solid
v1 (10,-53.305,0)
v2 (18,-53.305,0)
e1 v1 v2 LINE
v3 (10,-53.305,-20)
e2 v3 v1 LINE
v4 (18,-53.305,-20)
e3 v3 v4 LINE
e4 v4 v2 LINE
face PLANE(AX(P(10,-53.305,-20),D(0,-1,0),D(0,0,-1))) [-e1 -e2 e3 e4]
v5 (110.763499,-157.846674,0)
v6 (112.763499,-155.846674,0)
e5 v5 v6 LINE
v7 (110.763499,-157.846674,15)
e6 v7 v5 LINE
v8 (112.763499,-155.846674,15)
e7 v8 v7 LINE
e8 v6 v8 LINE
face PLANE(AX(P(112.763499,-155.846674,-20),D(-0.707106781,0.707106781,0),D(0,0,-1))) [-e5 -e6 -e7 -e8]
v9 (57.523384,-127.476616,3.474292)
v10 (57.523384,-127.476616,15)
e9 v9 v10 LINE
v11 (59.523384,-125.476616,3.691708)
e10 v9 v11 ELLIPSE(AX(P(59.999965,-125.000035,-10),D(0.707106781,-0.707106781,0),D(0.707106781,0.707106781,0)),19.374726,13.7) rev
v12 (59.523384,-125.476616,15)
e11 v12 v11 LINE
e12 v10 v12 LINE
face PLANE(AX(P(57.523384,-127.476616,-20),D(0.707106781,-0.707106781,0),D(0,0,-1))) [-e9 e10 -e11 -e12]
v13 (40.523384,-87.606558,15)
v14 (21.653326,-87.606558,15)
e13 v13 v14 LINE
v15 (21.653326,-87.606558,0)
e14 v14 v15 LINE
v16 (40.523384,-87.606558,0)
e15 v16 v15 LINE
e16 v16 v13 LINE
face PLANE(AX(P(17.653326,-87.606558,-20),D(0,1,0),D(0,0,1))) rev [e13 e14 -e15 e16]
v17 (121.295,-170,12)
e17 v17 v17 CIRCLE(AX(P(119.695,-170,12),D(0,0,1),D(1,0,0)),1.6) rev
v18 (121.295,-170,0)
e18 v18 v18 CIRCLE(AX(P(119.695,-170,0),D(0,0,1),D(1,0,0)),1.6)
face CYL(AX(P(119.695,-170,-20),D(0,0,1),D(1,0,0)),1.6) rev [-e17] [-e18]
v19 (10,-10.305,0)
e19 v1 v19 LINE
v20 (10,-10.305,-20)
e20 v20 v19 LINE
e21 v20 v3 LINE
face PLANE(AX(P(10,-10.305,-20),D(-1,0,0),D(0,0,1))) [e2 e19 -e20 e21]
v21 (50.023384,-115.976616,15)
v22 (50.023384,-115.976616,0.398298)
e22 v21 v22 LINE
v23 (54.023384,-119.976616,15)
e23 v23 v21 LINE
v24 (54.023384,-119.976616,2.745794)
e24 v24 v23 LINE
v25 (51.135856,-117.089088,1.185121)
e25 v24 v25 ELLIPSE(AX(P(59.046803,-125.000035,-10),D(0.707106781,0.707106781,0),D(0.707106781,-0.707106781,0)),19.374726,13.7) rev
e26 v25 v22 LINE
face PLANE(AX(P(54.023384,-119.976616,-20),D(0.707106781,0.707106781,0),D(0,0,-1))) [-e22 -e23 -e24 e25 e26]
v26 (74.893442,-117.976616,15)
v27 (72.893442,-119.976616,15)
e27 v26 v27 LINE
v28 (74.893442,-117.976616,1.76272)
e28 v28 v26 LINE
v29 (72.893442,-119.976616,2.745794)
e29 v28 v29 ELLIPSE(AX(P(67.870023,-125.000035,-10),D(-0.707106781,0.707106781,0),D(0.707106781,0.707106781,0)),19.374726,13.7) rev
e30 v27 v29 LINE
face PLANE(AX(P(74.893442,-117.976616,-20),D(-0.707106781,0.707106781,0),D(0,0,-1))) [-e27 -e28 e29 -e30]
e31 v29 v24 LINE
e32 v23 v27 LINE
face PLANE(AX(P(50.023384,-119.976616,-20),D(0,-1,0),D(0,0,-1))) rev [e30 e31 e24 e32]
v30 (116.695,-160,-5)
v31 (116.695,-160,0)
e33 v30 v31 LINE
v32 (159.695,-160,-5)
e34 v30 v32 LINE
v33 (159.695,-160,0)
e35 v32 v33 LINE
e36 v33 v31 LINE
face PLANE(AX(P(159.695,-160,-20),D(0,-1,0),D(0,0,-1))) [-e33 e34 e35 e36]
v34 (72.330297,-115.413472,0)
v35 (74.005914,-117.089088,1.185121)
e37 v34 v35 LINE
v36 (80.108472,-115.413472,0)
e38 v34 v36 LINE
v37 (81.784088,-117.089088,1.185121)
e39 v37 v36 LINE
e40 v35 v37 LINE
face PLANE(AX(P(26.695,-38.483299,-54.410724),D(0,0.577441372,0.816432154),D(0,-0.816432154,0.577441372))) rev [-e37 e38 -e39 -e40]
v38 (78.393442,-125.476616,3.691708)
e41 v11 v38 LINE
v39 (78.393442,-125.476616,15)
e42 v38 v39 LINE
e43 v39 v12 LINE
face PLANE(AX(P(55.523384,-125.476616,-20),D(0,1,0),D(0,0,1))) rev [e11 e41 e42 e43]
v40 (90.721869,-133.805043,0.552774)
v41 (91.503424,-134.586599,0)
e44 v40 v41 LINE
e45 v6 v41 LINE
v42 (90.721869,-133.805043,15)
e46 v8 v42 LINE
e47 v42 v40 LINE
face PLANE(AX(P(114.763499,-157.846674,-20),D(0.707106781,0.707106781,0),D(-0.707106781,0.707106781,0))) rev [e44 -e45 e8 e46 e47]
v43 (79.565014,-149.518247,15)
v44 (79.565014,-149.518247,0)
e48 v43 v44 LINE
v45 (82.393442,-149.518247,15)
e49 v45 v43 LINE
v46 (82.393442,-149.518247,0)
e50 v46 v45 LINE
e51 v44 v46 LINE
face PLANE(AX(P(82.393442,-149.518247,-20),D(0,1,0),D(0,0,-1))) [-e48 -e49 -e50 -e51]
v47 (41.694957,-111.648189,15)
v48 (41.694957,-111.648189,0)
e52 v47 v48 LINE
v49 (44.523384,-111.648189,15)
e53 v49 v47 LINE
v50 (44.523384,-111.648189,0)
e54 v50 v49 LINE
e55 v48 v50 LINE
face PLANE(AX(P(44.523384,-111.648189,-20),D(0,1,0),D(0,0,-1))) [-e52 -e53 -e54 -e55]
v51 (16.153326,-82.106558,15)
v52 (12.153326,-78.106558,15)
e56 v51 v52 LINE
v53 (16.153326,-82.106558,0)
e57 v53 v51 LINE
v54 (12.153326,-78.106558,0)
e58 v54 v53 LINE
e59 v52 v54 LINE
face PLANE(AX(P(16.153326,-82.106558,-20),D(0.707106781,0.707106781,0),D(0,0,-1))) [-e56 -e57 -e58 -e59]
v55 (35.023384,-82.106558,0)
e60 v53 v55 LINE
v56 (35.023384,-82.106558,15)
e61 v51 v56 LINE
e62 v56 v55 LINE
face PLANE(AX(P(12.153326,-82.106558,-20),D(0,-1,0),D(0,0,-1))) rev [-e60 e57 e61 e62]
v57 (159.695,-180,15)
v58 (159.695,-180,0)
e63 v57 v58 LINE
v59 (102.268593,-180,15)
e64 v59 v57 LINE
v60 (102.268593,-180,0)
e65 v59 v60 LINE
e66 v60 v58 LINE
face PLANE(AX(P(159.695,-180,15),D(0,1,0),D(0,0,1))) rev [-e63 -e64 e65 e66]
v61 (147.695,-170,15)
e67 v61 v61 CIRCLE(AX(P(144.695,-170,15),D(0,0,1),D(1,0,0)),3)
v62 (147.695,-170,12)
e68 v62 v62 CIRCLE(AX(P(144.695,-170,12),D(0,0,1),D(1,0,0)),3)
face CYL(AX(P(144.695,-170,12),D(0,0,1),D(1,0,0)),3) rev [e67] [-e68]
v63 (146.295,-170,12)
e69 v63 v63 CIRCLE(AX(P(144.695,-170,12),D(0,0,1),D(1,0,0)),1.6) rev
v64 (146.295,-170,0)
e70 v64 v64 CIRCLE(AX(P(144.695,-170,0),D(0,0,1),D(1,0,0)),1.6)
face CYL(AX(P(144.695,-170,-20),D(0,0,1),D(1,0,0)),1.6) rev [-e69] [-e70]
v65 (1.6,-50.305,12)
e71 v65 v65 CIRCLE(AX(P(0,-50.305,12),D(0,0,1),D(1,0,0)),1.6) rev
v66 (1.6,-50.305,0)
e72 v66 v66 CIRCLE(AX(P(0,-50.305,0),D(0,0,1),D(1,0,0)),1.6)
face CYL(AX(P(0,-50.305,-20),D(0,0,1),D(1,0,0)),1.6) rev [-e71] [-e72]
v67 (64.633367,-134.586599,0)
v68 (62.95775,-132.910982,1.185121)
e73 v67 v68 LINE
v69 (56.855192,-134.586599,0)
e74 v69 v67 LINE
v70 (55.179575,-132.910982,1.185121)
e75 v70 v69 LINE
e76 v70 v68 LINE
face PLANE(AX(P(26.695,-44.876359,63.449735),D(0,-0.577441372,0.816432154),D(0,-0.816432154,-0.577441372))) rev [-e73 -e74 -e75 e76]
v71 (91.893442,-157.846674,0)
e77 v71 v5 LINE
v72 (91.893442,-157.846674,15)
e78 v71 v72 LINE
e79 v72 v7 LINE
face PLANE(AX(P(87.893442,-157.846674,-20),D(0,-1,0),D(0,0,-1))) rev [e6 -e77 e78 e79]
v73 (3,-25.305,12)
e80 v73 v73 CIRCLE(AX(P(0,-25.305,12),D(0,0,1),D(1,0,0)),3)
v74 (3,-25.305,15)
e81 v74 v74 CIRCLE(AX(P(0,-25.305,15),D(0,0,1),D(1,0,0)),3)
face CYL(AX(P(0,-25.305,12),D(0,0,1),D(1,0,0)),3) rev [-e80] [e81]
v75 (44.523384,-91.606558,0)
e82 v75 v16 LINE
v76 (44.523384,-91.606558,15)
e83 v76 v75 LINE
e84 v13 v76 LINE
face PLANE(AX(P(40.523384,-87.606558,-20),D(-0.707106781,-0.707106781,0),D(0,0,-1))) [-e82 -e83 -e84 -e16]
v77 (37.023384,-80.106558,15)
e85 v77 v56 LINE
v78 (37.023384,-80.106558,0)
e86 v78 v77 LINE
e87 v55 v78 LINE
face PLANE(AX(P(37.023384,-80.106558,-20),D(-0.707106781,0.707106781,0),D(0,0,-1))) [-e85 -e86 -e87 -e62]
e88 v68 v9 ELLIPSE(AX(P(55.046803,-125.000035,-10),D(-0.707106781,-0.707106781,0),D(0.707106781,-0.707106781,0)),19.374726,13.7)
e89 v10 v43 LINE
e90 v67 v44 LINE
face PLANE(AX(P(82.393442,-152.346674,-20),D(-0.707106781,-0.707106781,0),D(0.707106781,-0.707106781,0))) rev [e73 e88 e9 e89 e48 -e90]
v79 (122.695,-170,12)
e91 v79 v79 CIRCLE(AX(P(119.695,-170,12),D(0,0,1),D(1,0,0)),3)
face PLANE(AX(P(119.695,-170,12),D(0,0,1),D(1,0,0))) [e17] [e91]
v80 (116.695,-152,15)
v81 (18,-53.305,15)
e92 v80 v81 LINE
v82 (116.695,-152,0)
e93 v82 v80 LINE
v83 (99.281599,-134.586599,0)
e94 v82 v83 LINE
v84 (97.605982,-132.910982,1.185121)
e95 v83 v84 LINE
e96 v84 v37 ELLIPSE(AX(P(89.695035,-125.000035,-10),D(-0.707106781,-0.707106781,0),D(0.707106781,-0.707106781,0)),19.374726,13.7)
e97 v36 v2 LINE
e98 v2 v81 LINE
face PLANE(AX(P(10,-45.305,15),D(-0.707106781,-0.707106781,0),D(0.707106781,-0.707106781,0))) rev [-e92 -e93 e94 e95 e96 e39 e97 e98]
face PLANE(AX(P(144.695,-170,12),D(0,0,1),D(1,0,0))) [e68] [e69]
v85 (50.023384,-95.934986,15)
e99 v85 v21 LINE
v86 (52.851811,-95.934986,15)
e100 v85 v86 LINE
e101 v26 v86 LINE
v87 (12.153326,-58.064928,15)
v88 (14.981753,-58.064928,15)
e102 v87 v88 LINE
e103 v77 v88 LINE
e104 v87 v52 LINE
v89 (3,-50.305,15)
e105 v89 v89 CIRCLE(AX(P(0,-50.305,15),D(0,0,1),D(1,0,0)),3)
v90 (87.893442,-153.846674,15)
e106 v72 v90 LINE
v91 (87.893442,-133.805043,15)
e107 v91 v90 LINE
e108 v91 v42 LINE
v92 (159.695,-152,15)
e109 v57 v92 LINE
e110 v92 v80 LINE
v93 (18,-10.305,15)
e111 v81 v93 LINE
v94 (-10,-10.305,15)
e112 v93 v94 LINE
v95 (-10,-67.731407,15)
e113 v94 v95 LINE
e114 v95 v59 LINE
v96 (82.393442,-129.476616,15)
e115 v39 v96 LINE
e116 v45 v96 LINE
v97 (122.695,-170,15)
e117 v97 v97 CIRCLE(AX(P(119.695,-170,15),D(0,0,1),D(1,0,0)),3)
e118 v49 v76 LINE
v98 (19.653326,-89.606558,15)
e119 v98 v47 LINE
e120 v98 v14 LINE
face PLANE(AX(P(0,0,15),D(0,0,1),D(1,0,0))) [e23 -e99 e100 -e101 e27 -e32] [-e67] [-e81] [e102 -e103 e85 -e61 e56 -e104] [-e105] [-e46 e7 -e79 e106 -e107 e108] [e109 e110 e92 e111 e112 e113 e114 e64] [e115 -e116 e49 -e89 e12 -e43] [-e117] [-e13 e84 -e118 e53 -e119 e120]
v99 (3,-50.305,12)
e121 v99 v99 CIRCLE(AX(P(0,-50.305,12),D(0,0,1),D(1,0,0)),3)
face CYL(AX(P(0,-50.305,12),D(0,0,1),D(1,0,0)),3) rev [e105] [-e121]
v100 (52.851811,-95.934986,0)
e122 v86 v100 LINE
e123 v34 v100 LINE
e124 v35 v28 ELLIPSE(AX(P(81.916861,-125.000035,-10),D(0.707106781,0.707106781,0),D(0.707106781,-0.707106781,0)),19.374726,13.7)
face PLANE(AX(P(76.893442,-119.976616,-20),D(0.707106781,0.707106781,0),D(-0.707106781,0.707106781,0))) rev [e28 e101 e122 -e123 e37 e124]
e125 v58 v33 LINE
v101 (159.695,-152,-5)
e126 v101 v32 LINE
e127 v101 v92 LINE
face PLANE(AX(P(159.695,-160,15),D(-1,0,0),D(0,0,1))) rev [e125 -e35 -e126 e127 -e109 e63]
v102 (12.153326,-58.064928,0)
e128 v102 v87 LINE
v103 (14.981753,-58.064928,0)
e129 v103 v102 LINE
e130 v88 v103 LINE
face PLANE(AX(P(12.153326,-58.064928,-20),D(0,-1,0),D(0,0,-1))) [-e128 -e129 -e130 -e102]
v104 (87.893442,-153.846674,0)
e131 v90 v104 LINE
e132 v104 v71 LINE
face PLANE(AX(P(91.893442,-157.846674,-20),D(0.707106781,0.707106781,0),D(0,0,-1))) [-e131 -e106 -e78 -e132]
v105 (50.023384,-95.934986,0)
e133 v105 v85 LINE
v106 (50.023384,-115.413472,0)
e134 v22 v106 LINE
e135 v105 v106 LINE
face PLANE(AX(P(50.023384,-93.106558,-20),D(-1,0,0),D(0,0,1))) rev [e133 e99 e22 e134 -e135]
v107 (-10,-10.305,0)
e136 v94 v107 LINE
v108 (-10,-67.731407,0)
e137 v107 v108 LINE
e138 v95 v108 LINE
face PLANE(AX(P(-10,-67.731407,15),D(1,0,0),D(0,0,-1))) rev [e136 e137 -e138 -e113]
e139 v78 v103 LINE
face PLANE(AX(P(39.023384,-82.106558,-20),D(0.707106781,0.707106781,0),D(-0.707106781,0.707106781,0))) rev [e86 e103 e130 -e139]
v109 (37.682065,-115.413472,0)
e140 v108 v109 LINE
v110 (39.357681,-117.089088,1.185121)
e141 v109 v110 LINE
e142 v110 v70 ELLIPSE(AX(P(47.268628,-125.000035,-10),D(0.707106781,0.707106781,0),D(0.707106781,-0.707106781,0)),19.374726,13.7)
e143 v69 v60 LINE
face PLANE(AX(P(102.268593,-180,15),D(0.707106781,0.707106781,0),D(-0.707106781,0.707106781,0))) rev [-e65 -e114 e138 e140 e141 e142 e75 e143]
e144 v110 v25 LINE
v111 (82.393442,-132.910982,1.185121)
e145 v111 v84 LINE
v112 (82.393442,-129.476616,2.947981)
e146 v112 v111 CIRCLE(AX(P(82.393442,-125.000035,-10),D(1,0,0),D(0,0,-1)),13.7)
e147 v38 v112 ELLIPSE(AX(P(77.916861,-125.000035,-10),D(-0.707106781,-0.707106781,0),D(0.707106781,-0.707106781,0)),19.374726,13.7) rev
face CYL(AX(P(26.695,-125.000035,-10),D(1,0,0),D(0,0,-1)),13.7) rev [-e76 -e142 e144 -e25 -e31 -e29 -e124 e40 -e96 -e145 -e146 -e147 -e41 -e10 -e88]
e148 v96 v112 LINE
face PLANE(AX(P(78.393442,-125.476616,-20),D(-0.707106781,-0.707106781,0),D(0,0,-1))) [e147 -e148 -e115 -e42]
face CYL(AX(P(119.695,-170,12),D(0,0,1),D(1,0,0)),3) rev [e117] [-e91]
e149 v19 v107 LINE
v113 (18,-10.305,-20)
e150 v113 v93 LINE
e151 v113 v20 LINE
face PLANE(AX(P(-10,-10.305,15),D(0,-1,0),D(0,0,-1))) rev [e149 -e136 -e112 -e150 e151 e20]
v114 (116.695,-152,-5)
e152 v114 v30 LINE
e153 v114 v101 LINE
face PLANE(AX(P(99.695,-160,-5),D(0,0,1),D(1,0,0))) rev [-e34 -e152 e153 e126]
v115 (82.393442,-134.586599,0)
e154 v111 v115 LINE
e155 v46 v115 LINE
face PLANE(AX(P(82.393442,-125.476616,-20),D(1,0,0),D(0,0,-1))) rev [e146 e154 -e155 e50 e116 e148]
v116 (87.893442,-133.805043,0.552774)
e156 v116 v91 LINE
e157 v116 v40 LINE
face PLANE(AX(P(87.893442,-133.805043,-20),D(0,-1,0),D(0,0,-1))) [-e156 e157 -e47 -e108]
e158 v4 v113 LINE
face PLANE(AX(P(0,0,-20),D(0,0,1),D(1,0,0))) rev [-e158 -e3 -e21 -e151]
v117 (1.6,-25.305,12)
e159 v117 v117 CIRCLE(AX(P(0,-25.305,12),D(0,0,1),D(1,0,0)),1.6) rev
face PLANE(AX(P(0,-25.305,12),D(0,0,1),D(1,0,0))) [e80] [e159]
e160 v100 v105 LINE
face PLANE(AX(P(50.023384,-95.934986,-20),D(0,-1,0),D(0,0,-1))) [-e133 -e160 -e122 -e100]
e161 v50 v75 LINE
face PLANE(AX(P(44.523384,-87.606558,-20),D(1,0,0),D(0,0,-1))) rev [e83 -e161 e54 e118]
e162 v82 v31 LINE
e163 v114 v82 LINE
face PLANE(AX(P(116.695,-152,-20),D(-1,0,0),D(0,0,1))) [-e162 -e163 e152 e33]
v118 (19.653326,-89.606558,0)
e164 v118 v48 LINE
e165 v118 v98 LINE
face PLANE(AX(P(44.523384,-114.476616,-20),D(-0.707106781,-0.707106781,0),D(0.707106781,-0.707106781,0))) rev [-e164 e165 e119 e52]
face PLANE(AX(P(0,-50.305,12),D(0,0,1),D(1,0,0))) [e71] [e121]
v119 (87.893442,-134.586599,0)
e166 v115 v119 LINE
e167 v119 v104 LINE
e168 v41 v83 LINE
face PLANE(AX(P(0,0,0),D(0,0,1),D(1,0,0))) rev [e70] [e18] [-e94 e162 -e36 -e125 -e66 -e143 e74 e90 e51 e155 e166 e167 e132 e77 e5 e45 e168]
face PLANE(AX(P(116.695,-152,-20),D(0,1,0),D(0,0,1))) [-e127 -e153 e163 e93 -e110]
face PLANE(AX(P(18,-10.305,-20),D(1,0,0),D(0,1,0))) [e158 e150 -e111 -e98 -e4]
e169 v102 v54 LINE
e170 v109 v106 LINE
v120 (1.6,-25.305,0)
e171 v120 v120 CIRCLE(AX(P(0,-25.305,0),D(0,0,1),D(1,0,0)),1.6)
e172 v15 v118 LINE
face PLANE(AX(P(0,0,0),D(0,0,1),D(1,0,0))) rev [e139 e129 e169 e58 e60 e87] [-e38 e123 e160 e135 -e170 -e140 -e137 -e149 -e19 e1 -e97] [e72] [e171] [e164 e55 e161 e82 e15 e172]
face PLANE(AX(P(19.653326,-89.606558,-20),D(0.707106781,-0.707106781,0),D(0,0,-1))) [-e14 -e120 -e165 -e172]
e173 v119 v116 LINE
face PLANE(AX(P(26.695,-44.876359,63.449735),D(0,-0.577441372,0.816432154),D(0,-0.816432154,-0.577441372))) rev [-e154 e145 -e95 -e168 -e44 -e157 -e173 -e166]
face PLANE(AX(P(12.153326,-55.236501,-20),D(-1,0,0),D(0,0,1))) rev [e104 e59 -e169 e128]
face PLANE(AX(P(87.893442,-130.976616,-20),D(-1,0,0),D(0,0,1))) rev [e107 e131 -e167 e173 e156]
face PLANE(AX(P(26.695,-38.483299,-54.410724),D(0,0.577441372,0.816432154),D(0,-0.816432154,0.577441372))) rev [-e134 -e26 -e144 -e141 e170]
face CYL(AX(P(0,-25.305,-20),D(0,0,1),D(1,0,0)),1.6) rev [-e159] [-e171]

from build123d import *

# Parameters (mm, degrees)
EXTRUDE_1_DEPTH     = 15
SKETCH_3_W          = 43
SKETCH_3_H          = 8
EXTRUDE_2_DEPTH     = 35
SKETCH_4_W          = 8
SKETCH_4_H          = 43
EXTRUDE_3_DEPTH     = 35
CUT_EXTRUDE_1_DEPTH = 244.161454645
SKETCH_6_R          = 1.6
CUT_EXTRUDE_2_DEPTH = 244.161454645
SKETCH_7_R          = 3
CUT_EXTRUDE_3_DEPTH = 3
CHAMFER_1_SIZE      = 2.828427125
CHAMFER_1_SIZE_2    = 4
CUT_EXTRUDE_4_DEPTH = 133
SKETCH_9_W          = 15
SKETCH_9_H          = 8
CUT_EXTRUDE_5_DEPTH = 43


with BuildPart() as part:
    # 草图1 → 凸台-拉伸1 (new body)
    with BuildSketch(Plane.XY):
        Polygon((124.695, -160), (159.695, -160), (159.695, -180), (102.268593129, -180), (-10, -67.731406871), (-10, -10.305), (10, -10.305), (10, -45.305), align=None)
    extrude(amount=EXTRUDE_1_DEPTH)

    # 草图3 → 凸台-拉伸2 (add)
    with BuildSketch(Plane.XY.offset(15)):
        with Locations((138.195, -156)):
            Rectangle(SKETCH_3_W, SKETCH_3_H)
    extrude(amount=-EXTRUDE_2_DEPTH)

    # 草图4 → 凸台-拉伸3 (add)
    with BuildSketch(Plane.XY.offset(15)):
        with Locations((14, -31.805)):
            Rectangle(SKETCH_4_W, SKETCH_4_H)
    extrude(amount=-EXTRUDE_3_DEPTH)

    # 草图5 → 切除-拉伸1 (cut, through all)
    with BuildSketch(Plane.XY.offset(15)):
        Polygon((50.023383861, -93.106558454), (50.023383861, -119.976616139), (76.893441546, -119.976616139), align=None)
        Polygon((55.523383861, -125.476616139), (82.393441546, -125.476616139), (82.393441546, -152.346673824), align=None)
        Polygon((12.153326176, -55.236500769), (12.153326176, -82.106558454), (39.023383861, -82.106558454), align=None)
        Polygon((87.893441546, -130.976616139), (87.893441546, -157.846673824), (114.763499231, -157.846673824), align=None)
        Polygon((17.653326176, -87.606558454), (44.523383861, -87.606558454), (44.523383861, -114.476616139), align=None)
    extrude(amount=-CUT_EXTRUDE_1_DEPTH, mode=Mode.SUBTRACT)

    # 草图6 → 切除-拉伸2 (cut, through all)
    with BuildSketch(Plane.XY.offset(15)):
        with Locations((0, -50.305)):
            Circle(SKETCH_6_R)
        with Locations((0, -25.305)):
            Circle(SKETCH_6_R)
        with Locations((119.695, -170)):
            Circle(SKETCH_6_R)
        with Locations((144.695, -170)):
            Circle(SKETCH_6_R)
    extrude(amount=-CUT_EXTRUDE_2_DEPTH, mode=Mode.SUBTRACT)

    # 草图7 → 切除-拉伸3 (cut)
    with BuildSketch(Plane.XY.offset(15)):
        with Locations((0, -25.305)):
            Circle(SKETCH_7_R)
        with Locations((0, -50.305)):
            Circle(SKETCH_7_R)
        with Locations((119.695, -170)):
            Circle(SKETCH_7_R)
        with Locations((144.695, -170)):
            Circle(SKETCH_7_R)
    extrude(amount=-CUT_EXTRUDE_3_DEPTH, mode=Mode.SUBTRACT)

    # 倒角1
    # the kernel refuses this chamfer: 4, 2.828427125 mm, written as the material it adds along each edge
    with BuildSketch(Plane(origin=(82.393441546, -152.346673824, 15), x_dir=(0.05647824947248942, 0.9984038297885898, 0), z_dir=(0, 0, -1)), Plane(origin=(55.523383861, -125.476616139, 15), x_dir=(0.6660419652145875, -0.7459142715976752, 0), z_dir=(0, 0, -1)), Plane(origin=(87.893441546, -130.976616139, 15), x_dir=(-0.05647824947248942, -0.9984038297885898, 0), z_dir=(0, 0, -1)), Plane(origin=(12.153326176, -55.236500769, 15), x_dir=(-0.05647824947249038, -0.9984038297885897, 0), z_dir=(0, 0, -1)), Plane(origin=(44.523383861, -114.476616139, 15), x_dir=(0.05647824947248914, 0.9984038297885898, 0), z_dir=(0, 0, -1)), Plane(origin=(17.653326176, -87.606558454, 15), x_dir=(0.6660419652145882, -0.7459142715976745, 0), z_dir=(0, 0, -1)), Plane(origin=(50.023383861, -93.106558454, 15), x_dir=(-0.05647824947248914, -0.9984038297885898, 0), z_dir=(0, 0, -1))) as chamfer_1_piece_1:
        Polygon((CHAMFER_1_SIZE * 0.998403829699, -CHAMFER_1_SIZE * 0.0564782494674), (CHAMFER_1_SIZE_2 * 0.666041965215, -CHAMFER_1_SIZE_2 * 0.745914271598), (0, 0), align=None)
    extrude(amount=15)
    with BuildSketch(Plane(origin=(82.393441546, -125.476616139, 15), x_dir=(0.02749587661058555, -0.9996219169112968, 0), z_dir=(0, 0, -1)), Plane(origin=(87.893441546, -157.846673824, 15), x_dir=(-0.02749587661058555, 0.9996219169112968, 0), z_dir=(0, 0, -1)), Plane(origin=(12.153326176, -82.106558454, 15), x_dir=(-0.02749587661058651, 0.9996219169112968, 0), z_dir=(0, 0, -1)), Plane(origin=(44.523383861, -87.606558454, 15), x_dir=(0.027495876610585647, -0.9996219169112968, 0), z_dir=(0, 0, -1)), Plane(origin=(50.023383861, -119.976616139, 15), x_dir=(-0.027495876610585647, 0.9996219169112968, 0), z_dir=(0, 0, -1))) as chamfer_1_piece_2:
        Polygon((CHAMFER_1_SIZE_2 * 0.999621916911, CHAMFER_1_SIZE_2 * 0.0274958766106), (-CHAMFER_1_SIZE_2 * 0.0274958766106, CHAMFER_1_SIZE_2 * 0.999621916911), (0, 0), align=None)
    extrude(amount=15)
    with BuildSketch(Plane(origin=(114.763499231, -157.846673824, 15), x_dir=(-0.9996219169112968, -0.0274958766105891, 0), z_dir=(0, 0, -1)), Plane(origin=(39.023383861, -82.106558454, 15), x_dir=(-0.9996219169112968, -0.027495876610585647, 0), z_dir=(0, 0, -1)), Plane(origin=(76.893441546, -119.976616139, 15), x_dir=(-0.9996219169112968, -0.027495876610585647, 0), z_dir=(0, 0, -1))) as chamfer_1_piece_3:
        Polygon((CHAMFER_1_SIZE_2 * 0.999621916911, CHAMFER_1_SIZE_2 * 0.0274958766106), (CHAMFER_1_SIZE * 0.687396915203, CHAMFER_1_SIZE * 0.726281956812), (0, 0), align=None)
    extrude(amount=15)

    # 草图8 → 切除-拉伸4 (cut)
    with BuildSketch(Plane(origin=(159.695, 0, 0), x_dir=(0, 0, -1), z_dir=(1, 0, 0))):
        with BuildLine():
            Line((-1.18512051, -132.91098195), (0, -134.586598797))
            Line((0, -134.586598797), (0, -115.413471515))
            Line((0, -115.413471515), (-1.18512051, -117.089088362))
            ThreePointArc((-1.18512051, -117.089088362), (-3.7, -125.000035156), (-1.18512051, -132.91098195))
        make_face()
    extrude(amount=-CUT_EXTRUDE_4_DEPTH, mode=Mode.SUBTRACT)

    # 草图9 → 切除-拉伸5 (cut)
    with BuildSketch(Plane(origin=(159.695, 0, 0), x_dir=(0, 0, -1), z_dir=(1, 0, 0))):
        with Locations((12.5, -156)):
            Rectangle(SKETCH_9_W, SKETCH_9_H)
    extrude(amount=-CUT_EXTRUDE_5_DEPTH, mode=Mode.SUBTRACT)


solid = part.part
